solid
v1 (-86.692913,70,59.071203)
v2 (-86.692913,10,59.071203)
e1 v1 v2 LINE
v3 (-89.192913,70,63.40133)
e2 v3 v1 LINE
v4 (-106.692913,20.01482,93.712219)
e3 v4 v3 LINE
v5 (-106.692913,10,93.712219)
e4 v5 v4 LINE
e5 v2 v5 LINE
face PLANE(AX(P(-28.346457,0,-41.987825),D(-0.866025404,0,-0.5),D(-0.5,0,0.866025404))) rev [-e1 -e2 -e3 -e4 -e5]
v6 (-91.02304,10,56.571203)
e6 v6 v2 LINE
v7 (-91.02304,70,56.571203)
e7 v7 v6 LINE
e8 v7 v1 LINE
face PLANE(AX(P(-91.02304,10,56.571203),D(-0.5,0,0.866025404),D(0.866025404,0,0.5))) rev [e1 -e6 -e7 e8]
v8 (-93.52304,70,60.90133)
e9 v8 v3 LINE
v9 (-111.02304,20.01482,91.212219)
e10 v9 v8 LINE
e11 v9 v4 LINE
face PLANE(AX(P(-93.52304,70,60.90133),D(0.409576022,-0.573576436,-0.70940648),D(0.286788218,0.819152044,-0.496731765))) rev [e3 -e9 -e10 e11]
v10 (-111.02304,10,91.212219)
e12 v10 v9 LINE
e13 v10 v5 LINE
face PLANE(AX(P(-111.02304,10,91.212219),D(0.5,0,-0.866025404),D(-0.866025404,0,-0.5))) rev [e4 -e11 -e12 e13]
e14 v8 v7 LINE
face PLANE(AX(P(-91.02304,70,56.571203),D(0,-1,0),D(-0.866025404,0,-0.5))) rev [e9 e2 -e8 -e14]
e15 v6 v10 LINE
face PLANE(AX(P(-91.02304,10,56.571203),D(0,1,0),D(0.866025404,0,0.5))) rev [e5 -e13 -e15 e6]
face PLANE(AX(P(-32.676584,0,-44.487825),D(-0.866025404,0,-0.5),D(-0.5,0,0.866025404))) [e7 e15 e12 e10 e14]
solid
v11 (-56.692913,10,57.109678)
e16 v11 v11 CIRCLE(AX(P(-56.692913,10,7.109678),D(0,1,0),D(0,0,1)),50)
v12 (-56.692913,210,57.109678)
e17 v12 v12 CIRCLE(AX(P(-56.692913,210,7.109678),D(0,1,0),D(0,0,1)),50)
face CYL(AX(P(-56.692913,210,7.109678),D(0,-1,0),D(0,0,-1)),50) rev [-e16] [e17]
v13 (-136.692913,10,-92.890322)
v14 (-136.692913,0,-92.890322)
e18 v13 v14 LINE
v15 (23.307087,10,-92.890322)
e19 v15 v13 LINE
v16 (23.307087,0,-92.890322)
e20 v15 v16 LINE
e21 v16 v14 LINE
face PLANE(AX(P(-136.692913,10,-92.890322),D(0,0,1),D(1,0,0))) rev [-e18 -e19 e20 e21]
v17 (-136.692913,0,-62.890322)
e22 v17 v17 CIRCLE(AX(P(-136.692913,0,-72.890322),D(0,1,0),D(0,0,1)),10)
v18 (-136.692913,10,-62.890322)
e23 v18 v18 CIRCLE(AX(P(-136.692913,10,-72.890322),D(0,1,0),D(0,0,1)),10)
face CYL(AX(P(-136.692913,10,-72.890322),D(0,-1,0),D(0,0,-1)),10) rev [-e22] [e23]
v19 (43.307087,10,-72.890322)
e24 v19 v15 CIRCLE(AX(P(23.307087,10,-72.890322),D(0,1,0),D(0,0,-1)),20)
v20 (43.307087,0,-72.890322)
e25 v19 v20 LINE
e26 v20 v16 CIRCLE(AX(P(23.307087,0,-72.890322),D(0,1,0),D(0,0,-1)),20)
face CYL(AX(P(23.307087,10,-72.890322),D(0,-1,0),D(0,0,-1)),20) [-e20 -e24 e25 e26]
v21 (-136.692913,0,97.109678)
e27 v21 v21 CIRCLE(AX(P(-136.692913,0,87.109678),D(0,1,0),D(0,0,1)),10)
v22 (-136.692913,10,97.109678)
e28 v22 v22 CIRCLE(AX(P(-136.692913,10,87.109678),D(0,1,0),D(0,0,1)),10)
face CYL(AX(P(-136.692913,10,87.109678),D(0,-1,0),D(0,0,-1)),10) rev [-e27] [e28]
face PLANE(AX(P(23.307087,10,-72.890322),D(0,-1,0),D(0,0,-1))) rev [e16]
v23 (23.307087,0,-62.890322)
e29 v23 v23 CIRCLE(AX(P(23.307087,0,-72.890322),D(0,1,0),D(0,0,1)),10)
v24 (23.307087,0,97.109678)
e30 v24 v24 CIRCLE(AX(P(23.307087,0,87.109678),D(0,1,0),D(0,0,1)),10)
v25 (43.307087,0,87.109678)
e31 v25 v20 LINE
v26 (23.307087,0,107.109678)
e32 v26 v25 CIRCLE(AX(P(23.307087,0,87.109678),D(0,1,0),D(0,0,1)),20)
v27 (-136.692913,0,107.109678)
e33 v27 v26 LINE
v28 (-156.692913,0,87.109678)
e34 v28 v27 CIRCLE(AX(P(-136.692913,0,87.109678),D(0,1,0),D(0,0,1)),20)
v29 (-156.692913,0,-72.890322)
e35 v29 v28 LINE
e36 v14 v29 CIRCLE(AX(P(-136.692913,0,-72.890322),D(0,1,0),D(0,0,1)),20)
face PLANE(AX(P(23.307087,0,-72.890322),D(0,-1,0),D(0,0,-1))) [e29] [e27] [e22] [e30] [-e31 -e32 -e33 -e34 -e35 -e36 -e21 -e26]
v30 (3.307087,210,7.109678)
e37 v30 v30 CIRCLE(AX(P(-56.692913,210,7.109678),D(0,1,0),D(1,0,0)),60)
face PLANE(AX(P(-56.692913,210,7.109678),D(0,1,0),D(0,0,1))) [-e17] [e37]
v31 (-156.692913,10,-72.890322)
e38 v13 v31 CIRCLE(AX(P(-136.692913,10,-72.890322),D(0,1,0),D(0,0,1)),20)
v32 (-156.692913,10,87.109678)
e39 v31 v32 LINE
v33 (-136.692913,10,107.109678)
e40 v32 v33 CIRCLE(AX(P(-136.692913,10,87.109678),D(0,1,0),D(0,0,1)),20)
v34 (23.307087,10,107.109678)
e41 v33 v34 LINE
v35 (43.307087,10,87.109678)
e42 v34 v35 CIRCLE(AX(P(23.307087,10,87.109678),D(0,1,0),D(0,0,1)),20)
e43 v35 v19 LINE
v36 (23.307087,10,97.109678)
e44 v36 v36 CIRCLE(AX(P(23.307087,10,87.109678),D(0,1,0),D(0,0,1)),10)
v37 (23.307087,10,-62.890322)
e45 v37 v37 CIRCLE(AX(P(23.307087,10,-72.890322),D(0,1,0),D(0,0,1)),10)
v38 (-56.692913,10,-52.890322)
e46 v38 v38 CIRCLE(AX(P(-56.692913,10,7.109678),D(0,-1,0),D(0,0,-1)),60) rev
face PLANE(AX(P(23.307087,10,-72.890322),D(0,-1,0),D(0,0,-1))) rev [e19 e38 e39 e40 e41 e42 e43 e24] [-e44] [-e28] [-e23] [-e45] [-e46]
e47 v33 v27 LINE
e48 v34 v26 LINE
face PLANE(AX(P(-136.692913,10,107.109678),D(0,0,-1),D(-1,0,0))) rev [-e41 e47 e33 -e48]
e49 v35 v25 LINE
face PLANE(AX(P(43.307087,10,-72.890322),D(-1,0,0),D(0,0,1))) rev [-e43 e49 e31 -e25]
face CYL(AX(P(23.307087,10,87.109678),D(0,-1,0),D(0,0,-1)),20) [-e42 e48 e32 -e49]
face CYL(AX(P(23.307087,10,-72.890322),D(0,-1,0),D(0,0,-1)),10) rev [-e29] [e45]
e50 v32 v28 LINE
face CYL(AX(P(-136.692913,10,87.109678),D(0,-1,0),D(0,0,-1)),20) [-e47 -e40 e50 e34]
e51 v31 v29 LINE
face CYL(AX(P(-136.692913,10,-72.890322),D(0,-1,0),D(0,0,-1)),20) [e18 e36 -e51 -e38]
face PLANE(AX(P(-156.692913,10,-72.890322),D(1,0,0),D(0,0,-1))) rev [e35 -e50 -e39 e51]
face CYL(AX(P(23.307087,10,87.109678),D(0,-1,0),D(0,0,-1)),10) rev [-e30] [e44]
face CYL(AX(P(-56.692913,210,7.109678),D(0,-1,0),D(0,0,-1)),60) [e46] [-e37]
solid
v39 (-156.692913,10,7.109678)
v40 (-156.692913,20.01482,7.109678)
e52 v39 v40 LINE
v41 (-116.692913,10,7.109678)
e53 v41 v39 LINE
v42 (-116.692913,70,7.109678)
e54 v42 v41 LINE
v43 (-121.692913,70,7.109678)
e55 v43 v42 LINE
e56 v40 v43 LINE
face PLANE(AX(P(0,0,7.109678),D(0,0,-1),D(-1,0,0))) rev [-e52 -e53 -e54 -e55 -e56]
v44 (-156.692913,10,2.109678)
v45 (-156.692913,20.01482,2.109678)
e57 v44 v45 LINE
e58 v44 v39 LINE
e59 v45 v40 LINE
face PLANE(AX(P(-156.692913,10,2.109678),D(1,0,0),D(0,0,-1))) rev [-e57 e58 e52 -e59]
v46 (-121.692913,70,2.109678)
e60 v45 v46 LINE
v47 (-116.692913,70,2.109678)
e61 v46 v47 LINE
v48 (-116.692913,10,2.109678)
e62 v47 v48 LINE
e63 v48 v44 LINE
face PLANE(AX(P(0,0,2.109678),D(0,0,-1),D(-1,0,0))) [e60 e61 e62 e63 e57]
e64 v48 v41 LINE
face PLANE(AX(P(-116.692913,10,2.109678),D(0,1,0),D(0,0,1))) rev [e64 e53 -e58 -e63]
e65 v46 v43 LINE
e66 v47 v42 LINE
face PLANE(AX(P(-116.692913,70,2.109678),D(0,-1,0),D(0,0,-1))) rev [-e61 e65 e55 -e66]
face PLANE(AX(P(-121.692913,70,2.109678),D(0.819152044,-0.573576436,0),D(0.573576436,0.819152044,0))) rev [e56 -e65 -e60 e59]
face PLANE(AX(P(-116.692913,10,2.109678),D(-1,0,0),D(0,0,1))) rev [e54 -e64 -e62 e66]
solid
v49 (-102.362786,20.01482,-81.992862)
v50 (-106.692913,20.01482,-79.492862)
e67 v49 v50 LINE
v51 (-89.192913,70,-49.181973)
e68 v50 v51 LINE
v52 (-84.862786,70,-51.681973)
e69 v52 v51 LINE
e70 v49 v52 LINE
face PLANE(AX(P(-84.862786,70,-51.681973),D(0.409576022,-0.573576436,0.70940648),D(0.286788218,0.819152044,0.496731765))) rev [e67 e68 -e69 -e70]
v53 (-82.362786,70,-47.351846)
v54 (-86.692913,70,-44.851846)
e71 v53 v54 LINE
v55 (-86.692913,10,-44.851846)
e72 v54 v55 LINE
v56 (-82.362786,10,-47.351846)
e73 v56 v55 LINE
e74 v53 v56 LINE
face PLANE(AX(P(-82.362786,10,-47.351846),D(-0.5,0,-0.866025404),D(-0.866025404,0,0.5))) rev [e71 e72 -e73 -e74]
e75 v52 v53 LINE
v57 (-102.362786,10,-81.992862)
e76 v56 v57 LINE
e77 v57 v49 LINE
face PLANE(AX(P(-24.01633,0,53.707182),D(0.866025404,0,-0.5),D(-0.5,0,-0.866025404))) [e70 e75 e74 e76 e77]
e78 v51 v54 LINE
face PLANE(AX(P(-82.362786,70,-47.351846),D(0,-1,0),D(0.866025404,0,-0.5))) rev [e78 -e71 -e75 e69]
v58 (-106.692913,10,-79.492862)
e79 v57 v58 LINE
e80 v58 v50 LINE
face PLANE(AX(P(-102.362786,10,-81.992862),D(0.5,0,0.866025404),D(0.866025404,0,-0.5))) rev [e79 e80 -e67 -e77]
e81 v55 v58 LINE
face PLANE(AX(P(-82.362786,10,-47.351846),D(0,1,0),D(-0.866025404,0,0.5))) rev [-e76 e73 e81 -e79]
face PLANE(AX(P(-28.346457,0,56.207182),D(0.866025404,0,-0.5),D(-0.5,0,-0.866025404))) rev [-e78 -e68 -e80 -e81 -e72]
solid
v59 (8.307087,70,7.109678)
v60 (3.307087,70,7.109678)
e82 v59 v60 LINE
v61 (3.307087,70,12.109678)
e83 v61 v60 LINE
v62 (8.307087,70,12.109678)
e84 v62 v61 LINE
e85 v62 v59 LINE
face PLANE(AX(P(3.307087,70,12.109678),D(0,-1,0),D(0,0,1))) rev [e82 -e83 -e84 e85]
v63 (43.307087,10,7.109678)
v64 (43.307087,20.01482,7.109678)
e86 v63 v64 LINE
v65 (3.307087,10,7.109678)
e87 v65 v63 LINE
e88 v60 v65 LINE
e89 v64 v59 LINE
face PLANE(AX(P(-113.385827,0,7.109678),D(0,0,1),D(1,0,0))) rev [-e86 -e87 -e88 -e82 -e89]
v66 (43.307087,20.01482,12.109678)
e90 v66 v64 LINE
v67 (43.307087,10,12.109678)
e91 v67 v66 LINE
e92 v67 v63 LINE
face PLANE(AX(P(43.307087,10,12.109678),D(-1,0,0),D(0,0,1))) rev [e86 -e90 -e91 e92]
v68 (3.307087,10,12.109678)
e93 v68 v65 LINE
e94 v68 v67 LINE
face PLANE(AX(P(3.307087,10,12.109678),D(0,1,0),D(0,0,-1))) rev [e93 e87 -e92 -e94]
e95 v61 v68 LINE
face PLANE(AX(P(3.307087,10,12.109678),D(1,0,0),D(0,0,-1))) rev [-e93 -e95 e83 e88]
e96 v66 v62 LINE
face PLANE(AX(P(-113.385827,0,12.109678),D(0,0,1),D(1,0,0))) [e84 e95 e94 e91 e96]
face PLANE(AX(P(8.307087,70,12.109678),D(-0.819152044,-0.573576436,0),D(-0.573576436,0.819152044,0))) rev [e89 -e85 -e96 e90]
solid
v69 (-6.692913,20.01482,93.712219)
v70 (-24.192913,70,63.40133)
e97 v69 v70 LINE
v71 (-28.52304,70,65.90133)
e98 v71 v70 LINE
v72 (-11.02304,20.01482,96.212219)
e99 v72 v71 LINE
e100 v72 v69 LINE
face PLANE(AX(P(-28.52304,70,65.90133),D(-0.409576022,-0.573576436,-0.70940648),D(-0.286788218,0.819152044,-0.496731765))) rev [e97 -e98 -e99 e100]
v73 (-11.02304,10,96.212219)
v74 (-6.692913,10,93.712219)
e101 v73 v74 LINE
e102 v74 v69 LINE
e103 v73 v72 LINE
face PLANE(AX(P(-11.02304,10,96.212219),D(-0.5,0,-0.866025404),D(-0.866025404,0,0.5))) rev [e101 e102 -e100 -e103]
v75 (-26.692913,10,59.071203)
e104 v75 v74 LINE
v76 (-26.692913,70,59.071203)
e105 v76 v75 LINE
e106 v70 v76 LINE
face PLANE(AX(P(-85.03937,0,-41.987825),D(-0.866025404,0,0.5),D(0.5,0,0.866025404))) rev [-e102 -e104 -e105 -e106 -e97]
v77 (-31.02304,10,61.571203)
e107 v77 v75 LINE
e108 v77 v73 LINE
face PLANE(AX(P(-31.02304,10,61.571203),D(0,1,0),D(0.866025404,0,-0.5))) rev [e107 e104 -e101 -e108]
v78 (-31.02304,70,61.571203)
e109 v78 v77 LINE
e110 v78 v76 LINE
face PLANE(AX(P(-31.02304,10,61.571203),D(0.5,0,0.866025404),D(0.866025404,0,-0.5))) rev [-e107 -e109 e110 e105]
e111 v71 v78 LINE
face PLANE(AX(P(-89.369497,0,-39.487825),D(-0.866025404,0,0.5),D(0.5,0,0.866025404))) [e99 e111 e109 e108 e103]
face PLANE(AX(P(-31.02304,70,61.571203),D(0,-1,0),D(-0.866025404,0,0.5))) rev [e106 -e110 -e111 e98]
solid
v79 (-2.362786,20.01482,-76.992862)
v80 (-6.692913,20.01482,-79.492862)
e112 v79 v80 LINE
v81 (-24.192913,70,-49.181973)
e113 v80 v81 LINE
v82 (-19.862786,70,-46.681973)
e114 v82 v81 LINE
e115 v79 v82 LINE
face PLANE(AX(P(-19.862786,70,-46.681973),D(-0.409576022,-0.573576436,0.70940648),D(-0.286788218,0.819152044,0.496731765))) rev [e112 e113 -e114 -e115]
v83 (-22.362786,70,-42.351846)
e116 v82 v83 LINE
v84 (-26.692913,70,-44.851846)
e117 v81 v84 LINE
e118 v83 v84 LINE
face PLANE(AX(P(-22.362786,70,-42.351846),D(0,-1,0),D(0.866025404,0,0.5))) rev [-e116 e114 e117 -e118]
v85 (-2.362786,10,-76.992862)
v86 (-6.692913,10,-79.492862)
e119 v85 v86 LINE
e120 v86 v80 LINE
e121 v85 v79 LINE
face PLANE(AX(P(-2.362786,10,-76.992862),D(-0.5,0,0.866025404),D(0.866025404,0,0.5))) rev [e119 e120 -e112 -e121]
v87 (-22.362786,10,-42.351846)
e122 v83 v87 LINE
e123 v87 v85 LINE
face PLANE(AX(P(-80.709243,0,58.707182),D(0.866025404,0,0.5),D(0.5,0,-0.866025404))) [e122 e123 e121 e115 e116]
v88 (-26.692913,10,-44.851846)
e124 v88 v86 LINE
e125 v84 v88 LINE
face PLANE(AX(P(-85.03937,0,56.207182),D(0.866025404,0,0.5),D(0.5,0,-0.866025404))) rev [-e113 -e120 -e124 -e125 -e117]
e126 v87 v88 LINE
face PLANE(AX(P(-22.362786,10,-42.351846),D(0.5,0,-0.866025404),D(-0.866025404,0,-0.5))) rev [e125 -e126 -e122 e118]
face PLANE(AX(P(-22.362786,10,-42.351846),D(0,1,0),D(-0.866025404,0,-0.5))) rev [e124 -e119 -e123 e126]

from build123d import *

# Parameters (mm, degrees)
SKETCH1_R           = 10
BOSS_EXTRUDE1_DEPTH = 10
SKETCH2_R           = 60
SKETCH2_R_2         = 50
EXTRUDE_THIN1_DEPTH = 200
GUSSET1_START       = 2.109678302
GUSSET1_DEPTH       = 5
CIRPATTERN1_COUNT   = 6


# Read off the part's stored shape, not the designer's step: Gusset1
with BuildPart() as part:
    # Sketch1 → Boss-Extrude1 (new body)
    with BuildSketch(Plane(origin=(0, 0, 0), x_dir=(1, 0, 0), z_dir=(0, 1, 0))):
        with BuildLine():
            Line((-136.692913386, 92.890321698), (23.307086614, 92.890321698))
            ThreePointArc((23.307086614, 92.890321698), (37.449222238, 87.032457321), (43.307086614, 72.890321698))
            Line((43.307086614, 72.890321698), (43.307086614, -87.109678302))
            ThreePointArc((43.307086614, -87.109678302), (37.449222238, -101.251813926), (23.307086614, -107.109678302))
            Line((23.307086614, -107.109678302), (-136.692913386, -107.109678302))
            ThreePointArc((-136.692913386, -107.109678302), (-150.83504901, -101.251813926), (-156.692913386, -87.109678302))
            Line((-156.692913386, -87.109678302), (-156.692913386, 72.890321698))
            ThreePointArc((-156.692913386, 72.890321698), (-150.83504901, 87.032457321), (-136.692913386, 92.890321698))
        make_face()
        with Locations(Location((-136.692913386, 72.890321698, 0), (0, 0, 270))):
            Circle(SKETCH1_R, mode=Mode.SUBTRACT)
        with Locations(Location((-136.692913386, -87.109678302, 0), (0, 0, 270))):
            Circle(SKETCH1_R, mode=Mode.SUBTRACT)
        with Locations(Location((23.307086614, -87.109678302, 0), (0, 0, 270))):
            Circle(SKETCH1_R, mode=Mode.SUBTRACT)
        with Locations(Location((23.307086614, 72.890321698, 0), (0, 0, 270))):
            Circle(SKETCH1_R, mode=Mode.SUBTRACT)
    extrude(amount=BOSS_EXTRUDE1_DEPTH)

    # Sketch2 → Extrude-Thin1 (add)
    with BuildSketch(Plane(origin=(0, 10, 0), x_dir=(1, 0, 0), z_dir=(0, 1, 0))):
        with Locations((-56.692913386, -7.109678302)):
            Circle(SKETCH2_R)
        with Locations((-56.692913386, -7.109678302)):
            Circle(SKETCH2_R_2, mode=Mode.SUBTRACT)
    extrude(amount=EXTRUDE_THIN1_DEPTH)


with BuildPart() as body_2:
    # Gusset1 outline → Gusset1 (new body)
    with BuildSketch(Plane.XY.offset(GUSSET1_START)):
        Polygon((-116.692913386, 70), (-121.692913386, 70), (-156.692913386, 20.014819764), (-156.692913386, 10), (-116.692913386, 10), align=None)
    extrude(amount=GUSSET1_DEPTH)


with BuildPart() as cirpattern1_1:
    # CirPattern1: pattern copy
    add(body_2.part.rotate(Axis((-56.692913386, 0, 7.109678302), (0, 1, 0)), 1 * 360 / CIRPATTERN1_COUNT))


with BuildPart() as cirpattern1_2:
    # CirPattern1: pattern copy
    add(body_2.part.rotate(Axis((-56.692913386, 0, 7.109678302), (0, 1, 0)), 2 * 360 / CIRPATTERN1_COUNT))


with BuildPart() as cirpattern1_3:
    # CirPattern1: pattern copy
    add(body_2.part.rotate(Axis((-56.692913386, 0, 7.109678302), (0, 1, 0)), 3 * 360 / CIRPATTERN1_COUNT))


with BuildPart() as cirpattern1_4:
    # CirPattern1: pattern copy
    add(body_2.part.rotate(Axis((-56.692913386, 0, 7.109678302), (0, 1, 0)), 4 * 360 / CIRPATTERN1_COUNT))


with BuildPart() as cirpattern1_5:
    # CirPattern1: pattern copy
    add(body_2.part.rotate(Axis((-56.692913386, 0, 7.109678302), (0, 1, 0)), 5 * 360 / CIRPATTERN1_COUNT))


solid = Compound([part.part, body_2.part, cirpattern1_1.part, cirpattern1_2.part, cirpattern1_3.part, cirpattern1_4.part, cirpattern1_5.part])
